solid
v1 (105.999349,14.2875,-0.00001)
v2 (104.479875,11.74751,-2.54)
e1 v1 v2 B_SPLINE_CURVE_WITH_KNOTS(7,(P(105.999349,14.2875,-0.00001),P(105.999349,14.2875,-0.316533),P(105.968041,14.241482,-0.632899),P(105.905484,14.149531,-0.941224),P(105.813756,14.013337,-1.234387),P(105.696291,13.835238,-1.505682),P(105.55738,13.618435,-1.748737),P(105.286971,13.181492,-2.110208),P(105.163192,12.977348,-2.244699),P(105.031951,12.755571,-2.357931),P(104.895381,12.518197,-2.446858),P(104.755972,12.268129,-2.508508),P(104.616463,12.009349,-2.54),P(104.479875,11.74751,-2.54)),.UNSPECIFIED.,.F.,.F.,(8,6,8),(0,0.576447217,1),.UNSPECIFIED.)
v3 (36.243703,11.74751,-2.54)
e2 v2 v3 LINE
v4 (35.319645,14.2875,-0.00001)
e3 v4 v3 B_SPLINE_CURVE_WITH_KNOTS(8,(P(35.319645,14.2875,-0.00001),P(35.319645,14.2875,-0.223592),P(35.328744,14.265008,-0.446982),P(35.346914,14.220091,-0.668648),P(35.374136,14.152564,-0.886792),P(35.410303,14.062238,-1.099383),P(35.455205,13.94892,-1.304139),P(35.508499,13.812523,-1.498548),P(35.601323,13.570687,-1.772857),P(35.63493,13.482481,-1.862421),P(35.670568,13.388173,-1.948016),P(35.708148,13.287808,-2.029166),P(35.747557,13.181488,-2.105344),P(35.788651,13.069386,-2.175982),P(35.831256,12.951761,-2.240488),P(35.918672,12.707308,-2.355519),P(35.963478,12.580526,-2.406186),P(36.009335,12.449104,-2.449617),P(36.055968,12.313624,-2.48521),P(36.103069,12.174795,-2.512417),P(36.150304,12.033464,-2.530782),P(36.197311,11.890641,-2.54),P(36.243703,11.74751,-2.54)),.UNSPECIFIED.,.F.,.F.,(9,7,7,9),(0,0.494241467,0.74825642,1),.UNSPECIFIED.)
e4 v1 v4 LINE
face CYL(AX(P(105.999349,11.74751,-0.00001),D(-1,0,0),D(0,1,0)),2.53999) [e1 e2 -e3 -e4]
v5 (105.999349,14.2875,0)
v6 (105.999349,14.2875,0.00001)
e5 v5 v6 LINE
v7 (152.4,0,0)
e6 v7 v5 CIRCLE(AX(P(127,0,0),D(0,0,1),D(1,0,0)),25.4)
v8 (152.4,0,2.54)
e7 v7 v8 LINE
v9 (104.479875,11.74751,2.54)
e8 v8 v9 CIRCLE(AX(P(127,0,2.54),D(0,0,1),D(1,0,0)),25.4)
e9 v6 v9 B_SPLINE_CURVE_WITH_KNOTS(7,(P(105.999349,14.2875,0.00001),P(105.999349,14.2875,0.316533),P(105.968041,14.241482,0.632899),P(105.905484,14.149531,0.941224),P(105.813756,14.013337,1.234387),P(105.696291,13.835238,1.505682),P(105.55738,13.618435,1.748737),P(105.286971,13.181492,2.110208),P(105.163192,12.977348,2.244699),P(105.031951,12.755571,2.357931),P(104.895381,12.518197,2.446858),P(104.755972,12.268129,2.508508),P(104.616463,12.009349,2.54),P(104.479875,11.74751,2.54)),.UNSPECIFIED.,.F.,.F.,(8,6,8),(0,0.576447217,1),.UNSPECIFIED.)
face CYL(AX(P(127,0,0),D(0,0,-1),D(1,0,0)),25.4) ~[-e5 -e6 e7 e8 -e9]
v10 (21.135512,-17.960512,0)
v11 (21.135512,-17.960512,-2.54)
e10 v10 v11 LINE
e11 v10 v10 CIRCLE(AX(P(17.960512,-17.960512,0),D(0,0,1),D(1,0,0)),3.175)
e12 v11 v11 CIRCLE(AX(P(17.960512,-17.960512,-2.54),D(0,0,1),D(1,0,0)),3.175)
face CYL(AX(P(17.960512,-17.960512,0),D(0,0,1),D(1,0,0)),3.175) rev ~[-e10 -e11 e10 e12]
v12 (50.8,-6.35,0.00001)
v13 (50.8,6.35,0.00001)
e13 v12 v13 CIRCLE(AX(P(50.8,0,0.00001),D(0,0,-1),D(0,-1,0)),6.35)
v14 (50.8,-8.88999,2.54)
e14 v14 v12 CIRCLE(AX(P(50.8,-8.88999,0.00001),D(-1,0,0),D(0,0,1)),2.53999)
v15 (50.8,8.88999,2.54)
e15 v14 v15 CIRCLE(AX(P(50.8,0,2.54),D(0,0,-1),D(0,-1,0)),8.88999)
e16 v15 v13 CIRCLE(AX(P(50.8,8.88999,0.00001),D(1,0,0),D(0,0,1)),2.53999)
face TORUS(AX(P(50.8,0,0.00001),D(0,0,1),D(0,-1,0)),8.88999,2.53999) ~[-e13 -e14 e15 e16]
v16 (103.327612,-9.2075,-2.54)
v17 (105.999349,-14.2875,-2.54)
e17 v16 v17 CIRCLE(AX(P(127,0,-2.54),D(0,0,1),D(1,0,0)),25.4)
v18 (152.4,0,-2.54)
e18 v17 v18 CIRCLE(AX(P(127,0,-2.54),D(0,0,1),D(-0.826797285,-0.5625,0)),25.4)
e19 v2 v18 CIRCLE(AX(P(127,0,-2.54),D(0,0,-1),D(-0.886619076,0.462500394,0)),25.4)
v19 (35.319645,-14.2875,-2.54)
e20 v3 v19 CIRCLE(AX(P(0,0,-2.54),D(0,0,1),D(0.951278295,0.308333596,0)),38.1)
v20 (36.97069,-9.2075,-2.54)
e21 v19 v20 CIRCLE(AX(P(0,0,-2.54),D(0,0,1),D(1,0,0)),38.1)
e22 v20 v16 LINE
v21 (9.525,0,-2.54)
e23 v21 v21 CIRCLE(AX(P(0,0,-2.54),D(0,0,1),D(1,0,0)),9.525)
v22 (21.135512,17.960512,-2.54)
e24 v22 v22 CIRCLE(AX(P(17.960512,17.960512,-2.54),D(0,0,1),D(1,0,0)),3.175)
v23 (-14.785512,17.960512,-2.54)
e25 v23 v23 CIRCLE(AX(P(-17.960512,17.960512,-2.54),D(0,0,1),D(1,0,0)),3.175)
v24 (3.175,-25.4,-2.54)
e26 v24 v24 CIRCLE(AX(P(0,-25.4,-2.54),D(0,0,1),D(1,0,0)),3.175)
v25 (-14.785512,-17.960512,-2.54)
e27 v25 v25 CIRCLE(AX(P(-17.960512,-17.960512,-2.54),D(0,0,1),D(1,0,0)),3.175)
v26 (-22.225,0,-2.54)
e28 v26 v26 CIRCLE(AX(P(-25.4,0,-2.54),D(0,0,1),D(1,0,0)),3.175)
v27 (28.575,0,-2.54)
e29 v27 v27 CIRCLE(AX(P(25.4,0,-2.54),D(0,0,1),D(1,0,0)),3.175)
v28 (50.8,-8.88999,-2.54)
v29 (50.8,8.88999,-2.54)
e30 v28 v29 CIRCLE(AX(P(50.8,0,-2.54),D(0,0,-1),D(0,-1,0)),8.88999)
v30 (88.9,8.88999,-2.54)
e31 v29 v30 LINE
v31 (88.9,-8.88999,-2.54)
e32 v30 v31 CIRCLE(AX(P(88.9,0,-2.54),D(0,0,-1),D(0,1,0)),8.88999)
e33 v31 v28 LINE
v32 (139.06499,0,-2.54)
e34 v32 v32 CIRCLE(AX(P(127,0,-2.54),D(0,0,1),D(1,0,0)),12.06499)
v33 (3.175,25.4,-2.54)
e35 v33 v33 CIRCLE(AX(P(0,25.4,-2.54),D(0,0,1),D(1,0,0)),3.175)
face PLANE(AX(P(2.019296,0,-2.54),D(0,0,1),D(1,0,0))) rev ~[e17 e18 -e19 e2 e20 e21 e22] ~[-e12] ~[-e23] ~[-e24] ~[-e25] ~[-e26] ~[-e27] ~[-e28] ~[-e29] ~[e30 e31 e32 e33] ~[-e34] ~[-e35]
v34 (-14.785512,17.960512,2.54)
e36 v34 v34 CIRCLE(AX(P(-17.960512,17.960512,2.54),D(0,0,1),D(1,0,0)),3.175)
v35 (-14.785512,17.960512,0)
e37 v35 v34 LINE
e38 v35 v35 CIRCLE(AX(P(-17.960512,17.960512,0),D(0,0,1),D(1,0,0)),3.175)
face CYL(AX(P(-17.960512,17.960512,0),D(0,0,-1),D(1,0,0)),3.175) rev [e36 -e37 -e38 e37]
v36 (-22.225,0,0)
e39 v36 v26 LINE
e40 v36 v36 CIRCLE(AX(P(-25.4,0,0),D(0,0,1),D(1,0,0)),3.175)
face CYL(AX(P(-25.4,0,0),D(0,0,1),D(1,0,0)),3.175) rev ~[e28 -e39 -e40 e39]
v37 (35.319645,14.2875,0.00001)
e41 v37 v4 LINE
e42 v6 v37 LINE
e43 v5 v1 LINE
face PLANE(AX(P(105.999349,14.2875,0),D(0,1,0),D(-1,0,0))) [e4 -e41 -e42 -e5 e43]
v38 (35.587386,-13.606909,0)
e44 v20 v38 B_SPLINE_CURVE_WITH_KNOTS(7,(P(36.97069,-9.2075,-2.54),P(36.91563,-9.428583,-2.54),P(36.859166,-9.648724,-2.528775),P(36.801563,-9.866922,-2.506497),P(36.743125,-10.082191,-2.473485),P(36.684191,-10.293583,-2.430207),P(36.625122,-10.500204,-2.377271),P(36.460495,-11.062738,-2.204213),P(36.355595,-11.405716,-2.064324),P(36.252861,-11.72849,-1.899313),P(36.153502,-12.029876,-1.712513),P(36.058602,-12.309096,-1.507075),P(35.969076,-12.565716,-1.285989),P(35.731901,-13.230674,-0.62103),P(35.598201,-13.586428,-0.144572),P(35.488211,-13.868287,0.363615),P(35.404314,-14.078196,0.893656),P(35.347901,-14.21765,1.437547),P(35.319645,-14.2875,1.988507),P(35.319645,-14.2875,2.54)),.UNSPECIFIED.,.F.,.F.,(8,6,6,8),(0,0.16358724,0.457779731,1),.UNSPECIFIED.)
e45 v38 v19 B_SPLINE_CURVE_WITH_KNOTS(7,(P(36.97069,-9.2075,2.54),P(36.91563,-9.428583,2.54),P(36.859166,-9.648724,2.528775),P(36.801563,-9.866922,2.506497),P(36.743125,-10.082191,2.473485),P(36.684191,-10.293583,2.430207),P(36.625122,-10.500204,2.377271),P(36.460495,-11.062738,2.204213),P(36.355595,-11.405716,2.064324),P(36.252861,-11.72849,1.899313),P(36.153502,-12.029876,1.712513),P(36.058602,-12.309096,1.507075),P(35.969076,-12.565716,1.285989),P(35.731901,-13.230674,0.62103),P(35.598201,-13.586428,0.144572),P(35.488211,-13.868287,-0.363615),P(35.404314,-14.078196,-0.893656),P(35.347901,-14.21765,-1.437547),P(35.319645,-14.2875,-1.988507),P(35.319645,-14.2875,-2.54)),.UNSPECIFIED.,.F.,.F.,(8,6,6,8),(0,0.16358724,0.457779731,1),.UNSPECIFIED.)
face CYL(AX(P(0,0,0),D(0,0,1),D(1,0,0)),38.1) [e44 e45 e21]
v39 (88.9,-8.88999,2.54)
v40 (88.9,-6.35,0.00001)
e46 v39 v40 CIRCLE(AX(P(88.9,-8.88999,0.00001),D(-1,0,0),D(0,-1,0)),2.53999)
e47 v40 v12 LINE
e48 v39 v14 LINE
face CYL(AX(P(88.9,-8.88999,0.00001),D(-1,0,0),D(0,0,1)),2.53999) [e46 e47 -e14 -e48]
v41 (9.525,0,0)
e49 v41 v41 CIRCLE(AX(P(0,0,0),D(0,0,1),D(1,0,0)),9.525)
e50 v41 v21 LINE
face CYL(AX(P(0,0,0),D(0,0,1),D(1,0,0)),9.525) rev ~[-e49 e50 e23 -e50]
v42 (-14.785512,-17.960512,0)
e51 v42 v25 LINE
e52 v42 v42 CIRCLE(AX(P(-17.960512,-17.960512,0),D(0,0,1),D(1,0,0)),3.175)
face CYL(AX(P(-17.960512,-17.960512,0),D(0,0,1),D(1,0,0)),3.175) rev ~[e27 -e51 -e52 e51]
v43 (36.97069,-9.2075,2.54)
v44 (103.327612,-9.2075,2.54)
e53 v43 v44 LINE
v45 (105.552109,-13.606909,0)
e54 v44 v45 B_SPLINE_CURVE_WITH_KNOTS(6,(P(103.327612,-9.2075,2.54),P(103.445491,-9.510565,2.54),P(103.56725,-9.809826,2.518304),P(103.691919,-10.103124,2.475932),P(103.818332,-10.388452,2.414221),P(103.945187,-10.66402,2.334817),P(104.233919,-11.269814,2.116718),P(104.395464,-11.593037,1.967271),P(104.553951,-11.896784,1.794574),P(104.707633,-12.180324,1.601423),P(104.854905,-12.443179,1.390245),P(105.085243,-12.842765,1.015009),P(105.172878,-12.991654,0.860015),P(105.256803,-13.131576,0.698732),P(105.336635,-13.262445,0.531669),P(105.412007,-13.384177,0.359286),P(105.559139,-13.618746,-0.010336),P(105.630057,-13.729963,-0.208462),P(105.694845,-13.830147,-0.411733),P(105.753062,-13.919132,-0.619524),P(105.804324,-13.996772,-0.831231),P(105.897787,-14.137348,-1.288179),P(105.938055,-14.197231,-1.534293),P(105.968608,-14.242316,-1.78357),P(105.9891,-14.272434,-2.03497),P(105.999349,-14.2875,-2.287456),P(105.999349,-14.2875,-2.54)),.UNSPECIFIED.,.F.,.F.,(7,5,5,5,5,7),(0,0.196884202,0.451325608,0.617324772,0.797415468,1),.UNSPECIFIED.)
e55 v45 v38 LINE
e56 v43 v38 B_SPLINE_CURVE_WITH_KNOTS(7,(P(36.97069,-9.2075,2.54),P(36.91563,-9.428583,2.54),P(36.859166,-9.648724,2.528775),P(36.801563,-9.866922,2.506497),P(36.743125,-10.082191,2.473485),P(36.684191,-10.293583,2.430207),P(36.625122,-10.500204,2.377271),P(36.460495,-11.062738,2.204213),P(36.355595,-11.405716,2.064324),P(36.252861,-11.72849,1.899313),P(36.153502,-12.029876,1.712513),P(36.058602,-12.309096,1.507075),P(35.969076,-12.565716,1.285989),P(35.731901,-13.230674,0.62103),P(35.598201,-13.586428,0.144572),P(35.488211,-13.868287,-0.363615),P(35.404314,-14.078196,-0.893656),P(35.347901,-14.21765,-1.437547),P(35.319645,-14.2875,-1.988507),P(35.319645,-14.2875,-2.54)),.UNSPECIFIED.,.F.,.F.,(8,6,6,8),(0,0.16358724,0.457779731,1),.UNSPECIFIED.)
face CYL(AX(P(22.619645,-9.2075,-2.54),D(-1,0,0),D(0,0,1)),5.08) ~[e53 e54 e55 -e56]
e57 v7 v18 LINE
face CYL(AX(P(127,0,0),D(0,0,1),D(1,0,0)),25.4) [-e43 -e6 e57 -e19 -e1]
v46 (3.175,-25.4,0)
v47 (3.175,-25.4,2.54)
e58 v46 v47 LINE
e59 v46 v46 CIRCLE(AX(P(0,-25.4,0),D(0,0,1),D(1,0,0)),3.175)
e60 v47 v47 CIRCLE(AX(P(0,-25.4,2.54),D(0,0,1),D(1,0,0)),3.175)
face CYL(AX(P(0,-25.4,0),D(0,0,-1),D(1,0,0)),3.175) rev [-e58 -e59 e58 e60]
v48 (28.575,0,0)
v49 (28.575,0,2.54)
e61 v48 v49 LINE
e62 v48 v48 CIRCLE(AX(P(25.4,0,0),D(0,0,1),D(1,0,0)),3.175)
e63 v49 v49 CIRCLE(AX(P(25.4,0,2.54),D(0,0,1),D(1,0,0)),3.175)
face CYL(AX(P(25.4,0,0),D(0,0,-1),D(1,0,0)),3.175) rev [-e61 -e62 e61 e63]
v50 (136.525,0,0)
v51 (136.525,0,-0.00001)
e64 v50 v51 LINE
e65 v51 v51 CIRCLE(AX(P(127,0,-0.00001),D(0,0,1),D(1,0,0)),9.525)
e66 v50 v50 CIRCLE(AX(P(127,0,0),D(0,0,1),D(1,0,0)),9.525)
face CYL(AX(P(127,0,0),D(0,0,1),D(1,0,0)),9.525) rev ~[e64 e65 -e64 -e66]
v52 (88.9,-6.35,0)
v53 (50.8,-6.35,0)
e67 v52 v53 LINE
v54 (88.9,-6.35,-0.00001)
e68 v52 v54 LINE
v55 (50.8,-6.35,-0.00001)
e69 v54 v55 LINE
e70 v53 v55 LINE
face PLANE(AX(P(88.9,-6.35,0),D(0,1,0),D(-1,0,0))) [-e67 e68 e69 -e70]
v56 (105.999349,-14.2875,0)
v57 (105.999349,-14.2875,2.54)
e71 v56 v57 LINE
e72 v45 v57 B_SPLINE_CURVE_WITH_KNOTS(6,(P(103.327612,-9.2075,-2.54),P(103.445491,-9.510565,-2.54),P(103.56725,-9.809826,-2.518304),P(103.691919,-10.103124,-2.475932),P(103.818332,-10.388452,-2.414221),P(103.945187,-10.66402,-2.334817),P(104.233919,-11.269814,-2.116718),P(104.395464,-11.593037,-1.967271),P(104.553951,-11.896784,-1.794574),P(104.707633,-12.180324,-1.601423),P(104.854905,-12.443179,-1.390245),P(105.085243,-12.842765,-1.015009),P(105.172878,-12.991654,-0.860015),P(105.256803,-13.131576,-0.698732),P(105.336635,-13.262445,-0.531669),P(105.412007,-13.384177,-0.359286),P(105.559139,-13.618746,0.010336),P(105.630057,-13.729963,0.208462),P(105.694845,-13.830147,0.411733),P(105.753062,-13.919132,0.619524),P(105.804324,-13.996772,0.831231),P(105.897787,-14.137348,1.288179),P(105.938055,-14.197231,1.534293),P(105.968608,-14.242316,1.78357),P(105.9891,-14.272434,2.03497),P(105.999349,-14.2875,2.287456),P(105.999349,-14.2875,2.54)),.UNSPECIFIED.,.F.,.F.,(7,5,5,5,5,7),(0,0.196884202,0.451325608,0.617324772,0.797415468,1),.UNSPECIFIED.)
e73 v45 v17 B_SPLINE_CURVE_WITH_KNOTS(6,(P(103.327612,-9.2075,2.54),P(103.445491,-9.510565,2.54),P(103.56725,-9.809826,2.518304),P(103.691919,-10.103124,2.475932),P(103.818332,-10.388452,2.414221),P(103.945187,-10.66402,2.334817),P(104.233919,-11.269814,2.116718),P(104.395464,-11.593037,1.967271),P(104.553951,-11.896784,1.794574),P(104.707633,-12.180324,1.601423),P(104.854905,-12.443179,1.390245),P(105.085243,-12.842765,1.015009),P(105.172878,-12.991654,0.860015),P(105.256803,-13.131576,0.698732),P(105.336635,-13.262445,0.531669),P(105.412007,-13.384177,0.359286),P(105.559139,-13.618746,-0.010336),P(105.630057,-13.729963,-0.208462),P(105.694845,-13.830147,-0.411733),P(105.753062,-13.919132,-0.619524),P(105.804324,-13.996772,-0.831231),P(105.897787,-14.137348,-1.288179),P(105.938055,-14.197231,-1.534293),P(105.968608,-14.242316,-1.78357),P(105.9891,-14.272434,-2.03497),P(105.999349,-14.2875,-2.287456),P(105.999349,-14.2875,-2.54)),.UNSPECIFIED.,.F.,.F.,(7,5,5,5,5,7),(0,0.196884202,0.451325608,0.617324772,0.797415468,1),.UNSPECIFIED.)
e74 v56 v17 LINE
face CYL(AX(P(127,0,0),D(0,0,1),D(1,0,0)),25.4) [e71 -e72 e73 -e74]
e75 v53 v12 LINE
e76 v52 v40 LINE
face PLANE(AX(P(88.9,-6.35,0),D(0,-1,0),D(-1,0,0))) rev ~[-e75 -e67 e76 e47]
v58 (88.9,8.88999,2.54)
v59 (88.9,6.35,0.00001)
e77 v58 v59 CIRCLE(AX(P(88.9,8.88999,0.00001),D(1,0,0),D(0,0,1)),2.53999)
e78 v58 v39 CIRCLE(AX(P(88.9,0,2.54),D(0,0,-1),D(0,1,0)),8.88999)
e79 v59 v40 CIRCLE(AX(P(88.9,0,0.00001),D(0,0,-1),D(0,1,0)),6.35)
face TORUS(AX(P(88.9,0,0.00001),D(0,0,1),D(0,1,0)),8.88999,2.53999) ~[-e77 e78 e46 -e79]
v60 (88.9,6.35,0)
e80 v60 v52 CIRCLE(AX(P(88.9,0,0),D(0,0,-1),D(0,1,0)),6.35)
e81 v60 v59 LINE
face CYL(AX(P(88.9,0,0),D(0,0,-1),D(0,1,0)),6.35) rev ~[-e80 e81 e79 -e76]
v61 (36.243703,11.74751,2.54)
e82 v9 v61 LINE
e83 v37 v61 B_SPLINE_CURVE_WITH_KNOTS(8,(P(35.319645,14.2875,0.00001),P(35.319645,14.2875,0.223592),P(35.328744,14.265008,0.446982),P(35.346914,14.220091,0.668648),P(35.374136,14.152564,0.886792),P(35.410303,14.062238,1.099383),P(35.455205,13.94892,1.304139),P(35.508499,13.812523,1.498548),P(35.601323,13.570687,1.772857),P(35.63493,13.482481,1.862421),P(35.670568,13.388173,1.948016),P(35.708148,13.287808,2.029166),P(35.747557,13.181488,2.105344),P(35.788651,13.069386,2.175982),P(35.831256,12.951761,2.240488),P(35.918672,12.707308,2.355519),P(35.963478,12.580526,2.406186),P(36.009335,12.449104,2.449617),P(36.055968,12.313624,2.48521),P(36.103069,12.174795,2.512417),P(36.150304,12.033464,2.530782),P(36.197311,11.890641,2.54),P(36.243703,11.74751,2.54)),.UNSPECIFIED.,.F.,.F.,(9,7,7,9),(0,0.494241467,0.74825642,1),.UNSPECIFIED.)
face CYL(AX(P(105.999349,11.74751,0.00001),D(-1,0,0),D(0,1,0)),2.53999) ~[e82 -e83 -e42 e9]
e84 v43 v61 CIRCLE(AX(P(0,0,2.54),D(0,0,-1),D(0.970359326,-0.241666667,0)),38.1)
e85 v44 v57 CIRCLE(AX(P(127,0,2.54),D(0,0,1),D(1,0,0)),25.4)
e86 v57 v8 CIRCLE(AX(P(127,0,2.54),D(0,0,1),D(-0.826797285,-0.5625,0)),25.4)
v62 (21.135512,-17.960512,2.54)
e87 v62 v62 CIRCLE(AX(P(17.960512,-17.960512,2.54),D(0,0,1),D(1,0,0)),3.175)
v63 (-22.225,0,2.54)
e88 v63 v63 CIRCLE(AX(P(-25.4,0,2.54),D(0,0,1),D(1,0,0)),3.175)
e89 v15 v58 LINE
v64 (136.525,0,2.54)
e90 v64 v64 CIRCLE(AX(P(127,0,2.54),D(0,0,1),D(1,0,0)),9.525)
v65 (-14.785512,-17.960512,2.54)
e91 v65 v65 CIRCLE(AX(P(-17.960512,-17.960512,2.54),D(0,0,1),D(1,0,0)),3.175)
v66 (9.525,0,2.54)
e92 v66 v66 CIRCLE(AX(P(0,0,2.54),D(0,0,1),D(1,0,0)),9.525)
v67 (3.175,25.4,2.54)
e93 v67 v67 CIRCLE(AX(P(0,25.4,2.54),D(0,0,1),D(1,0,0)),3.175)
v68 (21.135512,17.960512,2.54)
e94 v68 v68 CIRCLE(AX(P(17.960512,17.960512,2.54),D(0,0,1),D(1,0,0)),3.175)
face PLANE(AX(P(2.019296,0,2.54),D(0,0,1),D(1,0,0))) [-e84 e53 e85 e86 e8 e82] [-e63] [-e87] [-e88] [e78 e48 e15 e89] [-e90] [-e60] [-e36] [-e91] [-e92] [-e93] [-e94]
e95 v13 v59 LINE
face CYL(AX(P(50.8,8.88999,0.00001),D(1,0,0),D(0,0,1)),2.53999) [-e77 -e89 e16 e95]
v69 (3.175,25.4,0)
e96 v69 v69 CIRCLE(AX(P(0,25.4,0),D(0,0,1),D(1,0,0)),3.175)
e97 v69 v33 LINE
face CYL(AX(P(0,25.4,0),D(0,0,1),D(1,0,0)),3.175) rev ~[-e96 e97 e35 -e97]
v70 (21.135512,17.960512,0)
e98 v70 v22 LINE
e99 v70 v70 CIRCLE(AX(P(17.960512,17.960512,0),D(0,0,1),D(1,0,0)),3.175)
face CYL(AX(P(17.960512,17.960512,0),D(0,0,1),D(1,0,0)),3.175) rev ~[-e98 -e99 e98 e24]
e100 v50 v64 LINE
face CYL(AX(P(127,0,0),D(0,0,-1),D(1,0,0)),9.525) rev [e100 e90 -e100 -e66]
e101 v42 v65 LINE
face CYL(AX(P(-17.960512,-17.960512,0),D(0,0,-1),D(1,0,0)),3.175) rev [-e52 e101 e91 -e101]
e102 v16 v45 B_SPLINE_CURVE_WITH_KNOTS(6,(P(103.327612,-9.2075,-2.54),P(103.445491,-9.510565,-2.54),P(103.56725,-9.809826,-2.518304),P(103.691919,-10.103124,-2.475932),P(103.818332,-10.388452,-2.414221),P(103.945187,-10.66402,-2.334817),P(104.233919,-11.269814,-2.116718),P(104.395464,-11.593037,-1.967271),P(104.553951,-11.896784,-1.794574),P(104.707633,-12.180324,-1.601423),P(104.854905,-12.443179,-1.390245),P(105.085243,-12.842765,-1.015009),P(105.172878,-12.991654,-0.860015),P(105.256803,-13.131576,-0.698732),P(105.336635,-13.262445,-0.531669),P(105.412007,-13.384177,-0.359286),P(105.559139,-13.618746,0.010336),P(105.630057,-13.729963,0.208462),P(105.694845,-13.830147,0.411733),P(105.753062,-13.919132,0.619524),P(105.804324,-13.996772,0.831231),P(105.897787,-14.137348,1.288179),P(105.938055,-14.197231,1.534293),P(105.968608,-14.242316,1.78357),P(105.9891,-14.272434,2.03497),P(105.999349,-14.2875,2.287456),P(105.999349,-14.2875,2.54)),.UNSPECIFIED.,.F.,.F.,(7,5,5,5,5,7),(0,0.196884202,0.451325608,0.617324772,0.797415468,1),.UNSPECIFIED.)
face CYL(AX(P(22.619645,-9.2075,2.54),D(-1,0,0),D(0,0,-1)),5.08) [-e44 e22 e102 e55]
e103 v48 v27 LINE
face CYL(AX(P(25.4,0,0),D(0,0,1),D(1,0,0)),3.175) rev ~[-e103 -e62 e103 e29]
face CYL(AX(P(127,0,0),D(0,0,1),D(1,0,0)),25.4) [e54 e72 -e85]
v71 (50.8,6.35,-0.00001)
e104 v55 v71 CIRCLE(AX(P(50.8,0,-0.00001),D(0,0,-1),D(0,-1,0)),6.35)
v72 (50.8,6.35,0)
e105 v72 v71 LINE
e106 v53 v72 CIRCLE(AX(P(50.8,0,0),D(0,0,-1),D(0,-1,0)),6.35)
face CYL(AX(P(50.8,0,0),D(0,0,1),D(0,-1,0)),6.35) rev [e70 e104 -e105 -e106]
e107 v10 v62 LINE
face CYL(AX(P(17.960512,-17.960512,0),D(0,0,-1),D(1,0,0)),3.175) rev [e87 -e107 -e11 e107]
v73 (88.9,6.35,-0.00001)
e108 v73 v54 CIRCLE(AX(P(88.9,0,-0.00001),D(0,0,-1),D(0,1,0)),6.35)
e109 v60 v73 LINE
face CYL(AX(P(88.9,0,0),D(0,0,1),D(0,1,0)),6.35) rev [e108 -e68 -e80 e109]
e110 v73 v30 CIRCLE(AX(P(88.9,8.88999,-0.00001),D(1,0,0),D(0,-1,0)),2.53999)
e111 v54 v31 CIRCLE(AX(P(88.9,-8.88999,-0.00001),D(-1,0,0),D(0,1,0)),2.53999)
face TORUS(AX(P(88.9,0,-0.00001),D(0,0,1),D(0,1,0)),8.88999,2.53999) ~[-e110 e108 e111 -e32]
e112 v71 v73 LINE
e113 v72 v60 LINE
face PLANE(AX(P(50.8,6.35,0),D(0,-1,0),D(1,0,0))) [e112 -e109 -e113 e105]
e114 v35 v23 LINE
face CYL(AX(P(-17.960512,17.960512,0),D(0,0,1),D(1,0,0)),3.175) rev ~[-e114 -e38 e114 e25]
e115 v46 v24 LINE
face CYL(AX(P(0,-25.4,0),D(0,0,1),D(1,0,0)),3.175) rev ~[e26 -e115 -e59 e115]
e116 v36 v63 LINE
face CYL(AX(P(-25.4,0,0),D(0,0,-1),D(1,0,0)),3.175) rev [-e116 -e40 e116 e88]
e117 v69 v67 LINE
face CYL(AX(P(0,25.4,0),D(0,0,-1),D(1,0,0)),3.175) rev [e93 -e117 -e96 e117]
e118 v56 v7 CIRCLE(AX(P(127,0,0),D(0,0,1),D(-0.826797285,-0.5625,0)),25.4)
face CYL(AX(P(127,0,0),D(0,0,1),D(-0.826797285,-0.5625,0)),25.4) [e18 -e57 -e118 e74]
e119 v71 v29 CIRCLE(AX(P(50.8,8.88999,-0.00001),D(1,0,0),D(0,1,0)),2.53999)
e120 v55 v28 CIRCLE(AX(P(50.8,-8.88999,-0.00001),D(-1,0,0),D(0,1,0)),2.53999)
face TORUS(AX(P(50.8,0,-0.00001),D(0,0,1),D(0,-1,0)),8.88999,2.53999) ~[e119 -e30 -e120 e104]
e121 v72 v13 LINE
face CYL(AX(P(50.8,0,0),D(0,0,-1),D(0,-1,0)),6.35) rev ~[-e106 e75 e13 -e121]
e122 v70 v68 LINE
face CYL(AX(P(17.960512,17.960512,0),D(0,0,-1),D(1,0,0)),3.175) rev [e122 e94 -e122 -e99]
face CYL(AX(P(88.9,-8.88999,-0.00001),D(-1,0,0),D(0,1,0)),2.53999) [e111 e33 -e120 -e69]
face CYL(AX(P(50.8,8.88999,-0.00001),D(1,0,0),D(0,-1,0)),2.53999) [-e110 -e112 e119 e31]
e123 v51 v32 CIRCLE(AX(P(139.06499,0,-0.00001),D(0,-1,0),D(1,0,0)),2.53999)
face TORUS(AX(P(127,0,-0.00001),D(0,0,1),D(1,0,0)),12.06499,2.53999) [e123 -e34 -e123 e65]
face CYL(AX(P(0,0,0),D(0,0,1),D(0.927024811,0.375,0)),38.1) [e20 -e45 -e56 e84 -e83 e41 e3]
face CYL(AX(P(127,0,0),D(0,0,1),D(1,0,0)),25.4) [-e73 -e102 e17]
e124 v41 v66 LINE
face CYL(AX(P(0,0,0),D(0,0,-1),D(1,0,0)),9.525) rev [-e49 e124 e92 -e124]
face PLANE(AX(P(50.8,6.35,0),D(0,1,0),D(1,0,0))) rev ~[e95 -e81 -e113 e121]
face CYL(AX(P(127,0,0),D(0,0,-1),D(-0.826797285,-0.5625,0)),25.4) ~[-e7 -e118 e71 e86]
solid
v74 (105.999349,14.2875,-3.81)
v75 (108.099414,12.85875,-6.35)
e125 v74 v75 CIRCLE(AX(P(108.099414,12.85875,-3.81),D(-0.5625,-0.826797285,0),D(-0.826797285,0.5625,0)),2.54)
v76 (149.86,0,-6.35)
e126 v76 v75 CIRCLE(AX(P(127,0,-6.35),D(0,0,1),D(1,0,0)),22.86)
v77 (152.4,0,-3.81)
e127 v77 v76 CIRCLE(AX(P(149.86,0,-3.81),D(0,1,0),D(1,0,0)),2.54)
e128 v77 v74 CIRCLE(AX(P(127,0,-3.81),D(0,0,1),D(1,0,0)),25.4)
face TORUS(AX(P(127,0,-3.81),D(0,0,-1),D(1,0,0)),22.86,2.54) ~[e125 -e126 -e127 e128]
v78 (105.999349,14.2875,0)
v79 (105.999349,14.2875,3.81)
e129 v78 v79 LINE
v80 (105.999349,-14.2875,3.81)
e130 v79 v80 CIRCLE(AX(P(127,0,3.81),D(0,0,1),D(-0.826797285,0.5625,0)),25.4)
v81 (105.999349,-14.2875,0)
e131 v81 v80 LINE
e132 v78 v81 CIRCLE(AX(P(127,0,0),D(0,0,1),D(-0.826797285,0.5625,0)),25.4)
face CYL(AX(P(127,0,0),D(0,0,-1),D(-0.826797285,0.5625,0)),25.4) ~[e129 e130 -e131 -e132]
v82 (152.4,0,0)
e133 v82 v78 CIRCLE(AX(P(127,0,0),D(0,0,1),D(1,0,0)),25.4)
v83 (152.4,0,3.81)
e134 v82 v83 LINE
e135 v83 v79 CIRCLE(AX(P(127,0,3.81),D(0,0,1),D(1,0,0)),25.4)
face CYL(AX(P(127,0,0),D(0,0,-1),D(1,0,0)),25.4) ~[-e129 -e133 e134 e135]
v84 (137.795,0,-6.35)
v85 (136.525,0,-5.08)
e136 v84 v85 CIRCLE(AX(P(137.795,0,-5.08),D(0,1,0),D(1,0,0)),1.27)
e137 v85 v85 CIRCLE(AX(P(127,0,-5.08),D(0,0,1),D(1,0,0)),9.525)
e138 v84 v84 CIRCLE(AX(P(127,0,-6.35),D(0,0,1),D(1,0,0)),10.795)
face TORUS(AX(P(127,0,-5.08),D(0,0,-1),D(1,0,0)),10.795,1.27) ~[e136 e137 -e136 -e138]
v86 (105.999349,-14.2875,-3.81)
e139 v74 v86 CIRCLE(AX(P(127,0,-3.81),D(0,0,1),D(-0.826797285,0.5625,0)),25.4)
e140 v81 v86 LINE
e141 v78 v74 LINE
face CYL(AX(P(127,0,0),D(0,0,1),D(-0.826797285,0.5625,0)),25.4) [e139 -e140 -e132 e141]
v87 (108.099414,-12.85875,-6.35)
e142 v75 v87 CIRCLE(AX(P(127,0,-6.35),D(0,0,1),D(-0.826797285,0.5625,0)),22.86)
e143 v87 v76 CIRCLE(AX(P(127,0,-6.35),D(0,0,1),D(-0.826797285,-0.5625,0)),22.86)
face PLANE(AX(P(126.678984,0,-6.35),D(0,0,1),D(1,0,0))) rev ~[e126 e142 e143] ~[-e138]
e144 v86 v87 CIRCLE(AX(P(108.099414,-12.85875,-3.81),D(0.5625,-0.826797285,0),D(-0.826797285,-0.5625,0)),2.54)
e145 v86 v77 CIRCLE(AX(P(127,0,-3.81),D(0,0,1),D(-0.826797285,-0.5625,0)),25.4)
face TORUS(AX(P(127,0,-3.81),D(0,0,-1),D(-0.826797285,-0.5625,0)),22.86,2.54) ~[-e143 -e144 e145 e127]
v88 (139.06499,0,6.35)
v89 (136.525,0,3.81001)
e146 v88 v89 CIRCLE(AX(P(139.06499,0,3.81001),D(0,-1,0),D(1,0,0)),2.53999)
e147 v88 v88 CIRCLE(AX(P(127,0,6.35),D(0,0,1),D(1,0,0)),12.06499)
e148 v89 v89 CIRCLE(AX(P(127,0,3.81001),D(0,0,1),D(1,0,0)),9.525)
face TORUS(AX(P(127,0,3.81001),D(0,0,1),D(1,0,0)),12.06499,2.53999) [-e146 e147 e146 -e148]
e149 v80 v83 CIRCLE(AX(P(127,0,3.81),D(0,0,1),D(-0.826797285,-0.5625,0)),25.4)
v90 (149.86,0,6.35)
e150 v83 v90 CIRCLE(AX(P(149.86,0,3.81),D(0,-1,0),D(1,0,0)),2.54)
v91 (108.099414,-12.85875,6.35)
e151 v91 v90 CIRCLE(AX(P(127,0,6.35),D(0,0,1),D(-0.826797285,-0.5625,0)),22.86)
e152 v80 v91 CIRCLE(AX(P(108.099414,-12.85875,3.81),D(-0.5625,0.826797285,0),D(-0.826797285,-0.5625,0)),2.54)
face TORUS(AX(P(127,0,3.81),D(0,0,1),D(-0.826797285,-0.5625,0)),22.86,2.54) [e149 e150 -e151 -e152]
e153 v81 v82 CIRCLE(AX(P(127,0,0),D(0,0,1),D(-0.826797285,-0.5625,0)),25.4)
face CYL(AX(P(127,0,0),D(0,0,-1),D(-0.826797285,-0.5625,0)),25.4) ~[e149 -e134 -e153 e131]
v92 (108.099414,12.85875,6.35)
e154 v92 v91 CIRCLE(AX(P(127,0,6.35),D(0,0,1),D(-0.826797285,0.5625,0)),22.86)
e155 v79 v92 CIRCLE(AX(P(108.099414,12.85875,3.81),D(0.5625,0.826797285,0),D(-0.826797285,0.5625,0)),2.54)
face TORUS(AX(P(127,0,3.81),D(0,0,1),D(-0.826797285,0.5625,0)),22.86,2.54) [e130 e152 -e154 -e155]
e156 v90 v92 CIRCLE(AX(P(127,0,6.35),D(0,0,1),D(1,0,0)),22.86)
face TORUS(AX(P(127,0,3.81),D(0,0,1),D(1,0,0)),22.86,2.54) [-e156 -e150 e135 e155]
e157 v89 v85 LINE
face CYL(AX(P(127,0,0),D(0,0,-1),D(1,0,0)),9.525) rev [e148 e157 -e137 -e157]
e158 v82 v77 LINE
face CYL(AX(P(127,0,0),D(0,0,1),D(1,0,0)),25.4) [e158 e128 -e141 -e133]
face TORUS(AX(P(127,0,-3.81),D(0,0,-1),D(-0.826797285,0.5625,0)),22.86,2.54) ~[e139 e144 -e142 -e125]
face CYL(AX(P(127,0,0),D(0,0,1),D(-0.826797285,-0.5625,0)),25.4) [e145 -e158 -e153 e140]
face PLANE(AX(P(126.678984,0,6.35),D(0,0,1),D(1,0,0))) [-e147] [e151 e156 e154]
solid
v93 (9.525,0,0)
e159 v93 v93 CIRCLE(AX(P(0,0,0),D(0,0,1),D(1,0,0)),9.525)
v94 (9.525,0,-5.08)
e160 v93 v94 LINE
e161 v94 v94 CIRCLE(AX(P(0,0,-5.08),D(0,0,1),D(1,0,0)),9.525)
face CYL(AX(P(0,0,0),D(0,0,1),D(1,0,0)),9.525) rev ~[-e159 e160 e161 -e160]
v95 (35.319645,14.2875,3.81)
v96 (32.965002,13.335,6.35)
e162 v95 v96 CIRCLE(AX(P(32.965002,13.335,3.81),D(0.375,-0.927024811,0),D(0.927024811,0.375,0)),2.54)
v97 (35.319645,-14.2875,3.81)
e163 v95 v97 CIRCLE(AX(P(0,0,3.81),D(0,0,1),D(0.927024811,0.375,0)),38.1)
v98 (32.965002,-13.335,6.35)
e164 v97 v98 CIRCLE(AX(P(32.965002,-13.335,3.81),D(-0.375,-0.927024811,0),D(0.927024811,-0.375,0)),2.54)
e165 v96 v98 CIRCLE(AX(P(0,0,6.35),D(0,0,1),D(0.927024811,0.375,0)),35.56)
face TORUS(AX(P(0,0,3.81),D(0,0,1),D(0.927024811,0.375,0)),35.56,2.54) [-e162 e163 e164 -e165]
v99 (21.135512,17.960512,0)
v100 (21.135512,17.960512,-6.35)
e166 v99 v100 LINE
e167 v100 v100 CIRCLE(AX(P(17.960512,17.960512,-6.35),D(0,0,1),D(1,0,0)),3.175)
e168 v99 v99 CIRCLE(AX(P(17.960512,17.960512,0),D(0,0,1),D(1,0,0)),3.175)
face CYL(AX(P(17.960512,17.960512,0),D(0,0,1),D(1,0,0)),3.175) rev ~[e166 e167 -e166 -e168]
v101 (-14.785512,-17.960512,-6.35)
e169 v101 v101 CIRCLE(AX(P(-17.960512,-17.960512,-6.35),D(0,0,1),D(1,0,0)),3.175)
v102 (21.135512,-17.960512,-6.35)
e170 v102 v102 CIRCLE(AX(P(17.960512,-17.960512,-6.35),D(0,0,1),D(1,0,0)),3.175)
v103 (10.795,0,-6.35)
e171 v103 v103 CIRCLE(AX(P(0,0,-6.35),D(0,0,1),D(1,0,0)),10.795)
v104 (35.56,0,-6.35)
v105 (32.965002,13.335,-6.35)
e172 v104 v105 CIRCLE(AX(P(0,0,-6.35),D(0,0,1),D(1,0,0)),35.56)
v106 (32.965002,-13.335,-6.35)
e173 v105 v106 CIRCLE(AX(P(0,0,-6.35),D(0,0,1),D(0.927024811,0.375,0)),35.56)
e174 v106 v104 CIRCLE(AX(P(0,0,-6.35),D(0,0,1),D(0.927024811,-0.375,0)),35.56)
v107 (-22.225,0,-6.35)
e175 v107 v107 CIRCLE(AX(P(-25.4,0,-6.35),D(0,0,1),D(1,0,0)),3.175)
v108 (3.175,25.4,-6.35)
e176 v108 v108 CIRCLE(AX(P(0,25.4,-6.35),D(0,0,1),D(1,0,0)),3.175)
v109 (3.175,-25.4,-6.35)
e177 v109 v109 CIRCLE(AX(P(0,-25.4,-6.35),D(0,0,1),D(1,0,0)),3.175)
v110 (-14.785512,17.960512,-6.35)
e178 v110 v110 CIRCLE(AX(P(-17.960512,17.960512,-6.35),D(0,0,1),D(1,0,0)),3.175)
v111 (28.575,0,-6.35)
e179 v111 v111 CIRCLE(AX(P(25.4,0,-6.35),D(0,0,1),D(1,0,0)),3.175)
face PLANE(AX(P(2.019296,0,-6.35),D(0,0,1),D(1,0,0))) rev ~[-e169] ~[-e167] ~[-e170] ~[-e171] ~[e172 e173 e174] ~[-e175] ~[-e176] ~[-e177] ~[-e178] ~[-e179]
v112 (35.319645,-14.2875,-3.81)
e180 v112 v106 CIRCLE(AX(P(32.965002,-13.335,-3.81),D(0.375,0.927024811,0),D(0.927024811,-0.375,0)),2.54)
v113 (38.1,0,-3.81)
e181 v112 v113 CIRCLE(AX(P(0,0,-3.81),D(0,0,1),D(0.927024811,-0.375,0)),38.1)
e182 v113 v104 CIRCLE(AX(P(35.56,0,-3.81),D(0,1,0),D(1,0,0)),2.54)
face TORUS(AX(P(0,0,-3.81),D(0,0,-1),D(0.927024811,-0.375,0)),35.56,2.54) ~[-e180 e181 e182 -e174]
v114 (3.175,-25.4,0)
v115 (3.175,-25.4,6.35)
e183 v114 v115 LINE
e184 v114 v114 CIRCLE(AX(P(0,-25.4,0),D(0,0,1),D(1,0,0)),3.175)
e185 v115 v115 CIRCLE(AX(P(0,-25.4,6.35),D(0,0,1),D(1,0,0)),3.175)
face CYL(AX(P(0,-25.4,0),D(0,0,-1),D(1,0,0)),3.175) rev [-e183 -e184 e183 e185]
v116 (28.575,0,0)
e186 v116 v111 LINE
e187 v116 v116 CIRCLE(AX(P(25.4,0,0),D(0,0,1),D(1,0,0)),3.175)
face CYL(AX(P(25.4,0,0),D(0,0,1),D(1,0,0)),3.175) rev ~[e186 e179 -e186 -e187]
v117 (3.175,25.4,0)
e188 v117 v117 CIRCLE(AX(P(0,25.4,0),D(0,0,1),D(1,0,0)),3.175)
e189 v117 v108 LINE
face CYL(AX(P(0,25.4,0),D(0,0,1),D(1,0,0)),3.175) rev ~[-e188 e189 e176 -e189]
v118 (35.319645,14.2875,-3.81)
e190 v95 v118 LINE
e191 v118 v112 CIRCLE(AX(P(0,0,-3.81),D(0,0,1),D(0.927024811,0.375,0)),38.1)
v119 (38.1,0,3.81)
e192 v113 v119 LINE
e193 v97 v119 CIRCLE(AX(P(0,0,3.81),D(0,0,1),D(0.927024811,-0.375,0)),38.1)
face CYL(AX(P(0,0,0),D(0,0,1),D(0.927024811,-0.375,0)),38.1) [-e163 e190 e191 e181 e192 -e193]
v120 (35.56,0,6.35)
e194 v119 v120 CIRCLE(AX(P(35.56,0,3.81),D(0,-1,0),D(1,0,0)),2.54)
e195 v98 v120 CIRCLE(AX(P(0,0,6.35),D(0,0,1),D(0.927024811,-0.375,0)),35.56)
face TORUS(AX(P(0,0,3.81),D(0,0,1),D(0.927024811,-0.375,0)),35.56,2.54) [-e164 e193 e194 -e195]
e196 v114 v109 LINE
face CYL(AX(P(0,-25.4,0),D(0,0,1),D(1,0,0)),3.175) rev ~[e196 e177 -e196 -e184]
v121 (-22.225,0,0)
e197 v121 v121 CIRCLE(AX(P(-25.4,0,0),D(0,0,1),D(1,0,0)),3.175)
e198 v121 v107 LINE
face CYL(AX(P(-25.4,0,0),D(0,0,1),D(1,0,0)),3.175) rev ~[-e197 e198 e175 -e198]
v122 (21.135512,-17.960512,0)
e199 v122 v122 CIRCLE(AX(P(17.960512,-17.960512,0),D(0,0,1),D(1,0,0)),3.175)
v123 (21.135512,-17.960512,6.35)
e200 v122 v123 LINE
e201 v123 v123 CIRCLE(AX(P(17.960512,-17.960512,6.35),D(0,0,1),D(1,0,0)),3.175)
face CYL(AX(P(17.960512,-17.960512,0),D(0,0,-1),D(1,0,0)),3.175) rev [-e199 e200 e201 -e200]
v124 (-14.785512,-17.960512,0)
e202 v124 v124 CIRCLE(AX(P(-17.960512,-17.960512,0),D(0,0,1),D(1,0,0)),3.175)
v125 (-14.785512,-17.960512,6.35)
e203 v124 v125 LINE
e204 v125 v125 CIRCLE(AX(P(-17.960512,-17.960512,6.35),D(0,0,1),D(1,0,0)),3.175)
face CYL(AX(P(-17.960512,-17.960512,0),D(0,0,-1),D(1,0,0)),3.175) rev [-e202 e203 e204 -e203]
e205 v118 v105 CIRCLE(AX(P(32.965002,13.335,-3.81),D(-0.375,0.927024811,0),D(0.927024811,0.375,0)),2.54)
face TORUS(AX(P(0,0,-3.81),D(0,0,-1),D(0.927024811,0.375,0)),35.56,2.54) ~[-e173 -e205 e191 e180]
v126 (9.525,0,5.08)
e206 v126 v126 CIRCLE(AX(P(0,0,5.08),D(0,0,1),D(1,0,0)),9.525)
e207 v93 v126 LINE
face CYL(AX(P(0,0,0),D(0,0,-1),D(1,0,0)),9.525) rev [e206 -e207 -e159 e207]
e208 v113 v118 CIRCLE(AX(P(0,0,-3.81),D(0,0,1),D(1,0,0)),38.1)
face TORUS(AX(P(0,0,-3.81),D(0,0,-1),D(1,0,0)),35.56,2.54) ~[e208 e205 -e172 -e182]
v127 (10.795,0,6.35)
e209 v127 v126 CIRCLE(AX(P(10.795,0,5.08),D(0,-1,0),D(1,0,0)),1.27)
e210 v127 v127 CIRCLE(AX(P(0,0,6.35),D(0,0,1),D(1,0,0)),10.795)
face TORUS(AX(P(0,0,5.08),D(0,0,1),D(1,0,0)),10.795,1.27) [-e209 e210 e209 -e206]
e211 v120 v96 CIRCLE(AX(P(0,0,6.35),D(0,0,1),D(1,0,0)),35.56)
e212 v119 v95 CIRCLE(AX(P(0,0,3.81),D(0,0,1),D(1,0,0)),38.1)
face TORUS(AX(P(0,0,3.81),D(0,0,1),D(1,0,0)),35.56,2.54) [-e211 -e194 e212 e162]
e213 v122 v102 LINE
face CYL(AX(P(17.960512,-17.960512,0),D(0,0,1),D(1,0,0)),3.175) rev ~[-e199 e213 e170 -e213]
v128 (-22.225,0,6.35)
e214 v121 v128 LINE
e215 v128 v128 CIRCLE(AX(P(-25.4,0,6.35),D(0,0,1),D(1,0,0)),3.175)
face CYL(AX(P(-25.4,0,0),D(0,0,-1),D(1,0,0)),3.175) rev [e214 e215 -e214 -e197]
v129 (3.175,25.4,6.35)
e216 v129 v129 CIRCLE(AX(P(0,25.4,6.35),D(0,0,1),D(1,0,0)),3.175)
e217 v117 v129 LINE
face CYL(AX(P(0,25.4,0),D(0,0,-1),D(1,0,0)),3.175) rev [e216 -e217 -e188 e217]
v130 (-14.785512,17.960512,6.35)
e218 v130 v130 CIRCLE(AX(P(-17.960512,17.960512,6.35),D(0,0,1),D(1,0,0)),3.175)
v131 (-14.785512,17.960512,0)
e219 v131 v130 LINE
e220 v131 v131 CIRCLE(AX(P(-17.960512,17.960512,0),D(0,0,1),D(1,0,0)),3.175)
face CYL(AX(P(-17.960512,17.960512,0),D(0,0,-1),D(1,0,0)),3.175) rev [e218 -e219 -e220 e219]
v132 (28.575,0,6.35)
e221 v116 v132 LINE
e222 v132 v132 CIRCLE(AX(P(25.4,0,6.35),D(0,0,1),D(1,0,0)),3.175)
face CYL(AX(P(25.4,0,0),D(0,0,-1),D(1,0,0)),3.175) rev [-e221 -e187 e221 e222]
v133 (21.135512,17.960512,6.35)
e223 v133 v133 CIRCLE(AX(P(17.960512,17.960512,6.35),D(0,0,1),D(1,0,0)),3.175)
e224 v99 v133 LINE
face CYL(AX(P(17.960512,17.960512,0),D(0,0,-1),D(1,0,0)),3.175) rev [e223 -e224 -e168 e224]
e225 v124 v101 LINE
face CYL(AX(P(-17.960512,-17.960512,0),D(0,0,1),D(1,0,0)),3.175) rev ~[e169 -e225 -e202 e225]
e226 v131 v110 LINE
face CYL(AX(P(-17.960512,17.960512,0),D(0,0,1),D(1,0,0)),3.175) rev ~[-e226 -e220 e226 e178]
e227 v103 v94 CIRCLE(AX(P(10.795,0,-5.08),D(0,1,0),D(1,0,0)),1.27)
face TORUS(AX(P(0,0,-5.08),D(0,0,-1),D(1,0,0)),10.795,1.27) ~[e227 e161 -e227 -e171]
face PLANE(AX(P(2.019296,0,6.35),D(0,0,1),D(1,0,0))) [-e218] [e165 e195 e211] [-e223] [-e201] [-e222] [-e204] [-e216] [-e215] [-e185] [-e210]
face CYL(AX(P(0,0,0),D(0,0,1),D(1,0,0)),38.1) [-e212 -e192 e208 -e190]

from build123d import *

# Parameters (mm, degrees)
F0_R         = 3.175
F0_R_2       = 9.525
F1_DEPTH     = 6.35
F2_DEPTH     = 2.54
F3_R         = 2.54
F3_2_R       = 2.54
F4_R         = 2.53999
F4_2_R       = 2.53999
F5_T4_DEPTH  = 96.0797036736
F5_S5_R      = 38.1
F5_T6_DEPTH  = 50
F5_S7_R      = 25.4
F5_T8_DEPTH  = 50
F5_T12_DEPTH = 96.0797036736
F5_S13_R     = 38.1
F5_T14_DEPTH = 50
F5_S15_R     = 25.4
F5_T16_DEPTH = 50
F6_R         = 1.27
F6_2_R       = 1.27


# Not quite as in the source:
# - a fillet or chamfer that OpenCascade refuses, or shapes differently, is made with other operations: its cross-section is extruded or revolved along the edge and cut away or added
# - a fillet or chamfer is up to 0.001 mm smaller than in the source, because OpenCascade refuses the exact size


with BuildPart() as f1:
    # F0 (on Top) → F1 (new body, symmetric)
    with BuildSketch(Plane.XY):
        with BuildLine():
            ThreePointArc((35.3196452948, -14.2875), (37.3984524127, -7.2777576996), (38.1, 0))
            ThreePointArc((38.1, 0), (37.3984524127, 7.2777576996), (35.3196452948, 14.2875))
            ThreePointArc((35.3196452948, 14.2875), (-38.1, 0), (35.3196452948, -14.2875))
        make_face()
        with Locations((0, -25.4)):
            Circle(F0_R, mode=Mode.SUBTRACT)
        with Locations((-17.9605122421, -17.9605122421)):
            Circle(F0_R, mode=Mode.SUBTRACT)
        with Locations((17.9605122421, -17.9605122421)):
            Circle(F0_R, mode=Mode.SUBTRACT)
        with Locations((-25.4, 0)):
            Circle(F0_R, mode=Mode.SUBTRACT)
        Circle(F0_R_2, mode=Mode.SUBTRACT)
        with Locations((-17.9605122421, 17.9605122421)):
            Circle(F0_R, mode=Mode.SUBTRACT)
        with Locations((25.4, 0)):
            Circle(F0_R, mode=Mode.SUBTRACT)
        with Locations((17.9605122421, 17.9605122421)):
            Circle(F0_R, mode=Mode.SUBTRACT)
        with Locations((0, 25.4)):
            Circle(F0_R, mode=Mode.SUBTRACT)
    extrude(amount=F1_DEPTH, both=True)

    # F3
    f3_edges = [f1.edges().sort_by_distance(p)[0] for p in [
        (-38.1, 0, 6.35),
        (-38.1, 0, -6.35),
    ]]
    fillet(f3_edges, radius=F3_R)

    # F6
    f6_edges = [f1.edges().sort_by_distance(p)[0] for p in [
        (-9.525, 0, 6.35),
        (-9.525, 0, -6.35),
    ]]
    fillet(f6_edges, radius=F6_R)


with BuildPart() as f1b:
    # F0 (on Top) → F1, piece 2 (new body, symmetric)
    with BuildSketch(Plane.XY):
        with BuildLine():
            ThreePointArc((152.4, 0), (134.4747395874, 24.2752604126), (105.9993489684, 14.2875))
            ThreePointArc((105.9993489684, 14.2875), (101.6, 0), (105.9993489684, -14.2875))
            ThreePointArc((105.9993489684, -14.2875), (134.4747395874, -24.2752604126), (152.4, 0))
        make_face()
        with Locations((127, 0)):
            Circle(F0_R_2, mode=Mode.SUBTRACT)
    extrude(amount=F1_DEPTH, both=True)

    # F3#2
    f3_2_edges = [f1b.edges().sort_by_distance(p)[0] for p in [
        (101.6, 0, 6.35),
        (101.6, 0, -6.35),
    ]]
    fillet(f3_2_edges, radius=F3_2_R)

    # F4#2 (radius 2.54 in the source; OpenCascade refuses exactly that, so slightly less here)
    f4_2_edges = [f1b.edges().sort_by_distance(p)[0] for p in [
        (117.475, 0, 6.35),
    ]]
    fillet(f4_2_edges, radius=F4_2_R)

    # F6#2
    f6_2_edges = [f1b.edges().sort_by_distance(p)[0] for p in [
        (117.475, 0, -6.35),
    ]]
    fillet(f6_2_edges, radius=F6_2_R)


with BuildPart() as f2:
    # F0 (on Top) → F2 (new body, symmetric)
    with BuildSketch(Plane.XY):
        with BuildLine():
            ThreePointArc((35.3196452948, -14.2875), (37.3984524127, -7.2777576996), (38.1, 0))
            ThreePointArc((38.1, 0), (37.3984524127, 7.2777576996), (35.3196452948, 14.2875))
            ThreePointArc((35.3196452948, 14.2875), (-38.1, 0), (35.3196452948, -14.2875))
        make_face()
        with Locations((0, -25.4)):
            Circle(F0_R, mode=Mode.SUBTRACT)
        with Locations((-17.9605122421, -17.9605122421)):
            Circle(F0_R, mode=Mode.SUBTRACT)
        with Locations((17.9605122421, -17.9605122421)):
            Circle(F0_R, mode=Mode.SUBTRACT)
        with Locations((-25.4, 0)):
            Circle(F0_R, mode=Mode.SUBTRACT)
        Circle(F0_R_2, mode=Mode.SUBTRACT)
        with Locations((-17.9605122421, 17.9605122421)):
            Circle(F0_R, mode=Mode.SUBTRACT)
        with Locations((25.4, 0)):
            Circle(F0_R, mode=Mode.SUBTRACT)
        with Locations((17.9605122421, 17.9605122421)):
            Circle(F0_R, mode=Mode.SUBTRACT)
        with Locations((0, 25.4)):
            Circle(F0_R, mode=Mode.SUBTRACT)
        with BuildLine():
            ThreePointArc((35.3196452948, 14.2875), (37.3984524127, 7.2777576996), (38.1, 0))
            ThreePointArc((38.1, 0), (37.3984524127, -7.2777576996), (35.3196452948, -14.2875))
            Line((35.3196452948, -14.2875), (105.9993489684, -14.2875))
            ThreePointArc((105.9993489684, -14.2875), (101.6, 0), (105.9993489684, 14.2875))
            Line((105.9993489684, 14.2875), (35.3196452948, 14.2875))
        make_face()
        with BuildLine():
            Line((88.9, -6.35), (50.8, -6.35))
            ThreePointArc((50.8, -6.35), (44.45, 0), (50.8, 6.35))
            Line((50.8, 6.35), (88.9, 6.35))
            ThreePointArc((88.9, 6.35), (95.25, 0), (88.9, -6.35))
        make_face(mode=Mode.SUBTRACT)
        with BuildLine():
            ThreePointArc((152.4, 0), (134.4747395874, 24.2752604126), (105.9993489684, 14.2875))
            ThreePointArc((105.9993489684, 14.2875), (101.6, 0), (105.9993489684, -14.2875))
            ThreePointArc((105.9993489684, -14.2875), (134.4747395874, -24.2752604126), (152.4, 0))
        make_face()
        with Locations((127, 0)):
            Circle(F0_R_2, mode=Mode.SUBTRACT)
    extrude(amount=F2_DEPTH, both=True)

    # F4 (radius 2.54 in the source; OpenCascade refuses exactly that, so slightly less here)
    f4_edges = [f2.edges().sort_by_distance(p)[0] for p in [
        (70.659497, 14.2875, 2.54),
        (70.659497, 14.2875, -2.54),
        (69.85, 6.35, 2.54),
        (69.85, -6.35, 2.54),
        (117.475, 0, -2.54),
        (69.85, -6.35, -2.54),
    ]]
    fillet(f4_edges, radius=F4_R)

    # F5: fillet of radius 5.08 on 2 edges, made by hand


with BuildPart() as f5_tool2:
    # F5_s3 → F5_t4 (new body)
    with BuildSketch(Plane.YZ.offset(22.6196452948)):
        with BuildLine():
            ThreePointArc((-9.2075, 2.54), (-12.7996024484, 1.0521024484), (-14.2875, -2.54))
            Line((-14.2875, -2.54), (-14.2875, 2.54))
            Line((-14.2875, 2.54), (-9.2075, 2.54))
        make_face()
    extrude(amount=F5_T4_DEPTH)

    # F5_s5 → F5_t6 (cut, symmetric)
    with BuildSketch(Plane.XY):
        Circle(F5_S5_R)
    extrude(amount=F5_T6_DEPTH, both=True, mode=Mode.SUBTRACT)

    # F5_s7 → F5_t8 (cut, symmetric)
    with BuildSketch(Plane.XY):
        with Locations((127, 0)):
            Circle(F5_S7_R)
    extrude(amount=F5_T8_DEPTH, both=True, mode=Mode.SUBTRACT)


with BuildPart() as f2_1:
    add(f2.part)

    # F5_t1: cut F5_tool2
    add(f5_tool2.part, mode=Mode.SUBTRACT)


with BuildPart() as f5_tool10:
    # F5_s11 → F5_t12 (new body)
    with BuildSketch(Plane.YZ.offset(22.6196452948)):
        with BuildLine():
            ThreePointArc((-9.2075, -2.54), (-12.7996024484, -1.0521024484), (-14.2875, 2.54))
            Line((-14.2875, 2.54), (-14.2875, -2.54))
            Line((-14.2875, -2.54), (-9.2075, -2.54))
        make_face()
    extrude(amount=F5_T12_DEPTH)

    # F5_s13 → F5_t14 (cut, symmetric)
    with BuildSketch(Plane.XY):
        Circle(F5_S13_R)
    extrude(amount=F5_T14_DEPTH, both=True, mode=Mode.SUBTRACT)

    # F5_s15 → F5_t16 (cut, symmetric)
    with BuildSketch(Plane.XY):
        with Locations((127, 0)):
            Circle(F5_S15_R)
    extrude(amount=F5_T16_DEPTH, both=True, mode=Mode.SUBTRACT)


with BuildPart() as f2_2:
    add(f2_1.part)

    # F5_t9: cut F5_tool10
    add(f5_tool10.part, mode=Mode.SUBTRACT)


solid = Compound([f1.part, f1b.part, f2_2.part])
